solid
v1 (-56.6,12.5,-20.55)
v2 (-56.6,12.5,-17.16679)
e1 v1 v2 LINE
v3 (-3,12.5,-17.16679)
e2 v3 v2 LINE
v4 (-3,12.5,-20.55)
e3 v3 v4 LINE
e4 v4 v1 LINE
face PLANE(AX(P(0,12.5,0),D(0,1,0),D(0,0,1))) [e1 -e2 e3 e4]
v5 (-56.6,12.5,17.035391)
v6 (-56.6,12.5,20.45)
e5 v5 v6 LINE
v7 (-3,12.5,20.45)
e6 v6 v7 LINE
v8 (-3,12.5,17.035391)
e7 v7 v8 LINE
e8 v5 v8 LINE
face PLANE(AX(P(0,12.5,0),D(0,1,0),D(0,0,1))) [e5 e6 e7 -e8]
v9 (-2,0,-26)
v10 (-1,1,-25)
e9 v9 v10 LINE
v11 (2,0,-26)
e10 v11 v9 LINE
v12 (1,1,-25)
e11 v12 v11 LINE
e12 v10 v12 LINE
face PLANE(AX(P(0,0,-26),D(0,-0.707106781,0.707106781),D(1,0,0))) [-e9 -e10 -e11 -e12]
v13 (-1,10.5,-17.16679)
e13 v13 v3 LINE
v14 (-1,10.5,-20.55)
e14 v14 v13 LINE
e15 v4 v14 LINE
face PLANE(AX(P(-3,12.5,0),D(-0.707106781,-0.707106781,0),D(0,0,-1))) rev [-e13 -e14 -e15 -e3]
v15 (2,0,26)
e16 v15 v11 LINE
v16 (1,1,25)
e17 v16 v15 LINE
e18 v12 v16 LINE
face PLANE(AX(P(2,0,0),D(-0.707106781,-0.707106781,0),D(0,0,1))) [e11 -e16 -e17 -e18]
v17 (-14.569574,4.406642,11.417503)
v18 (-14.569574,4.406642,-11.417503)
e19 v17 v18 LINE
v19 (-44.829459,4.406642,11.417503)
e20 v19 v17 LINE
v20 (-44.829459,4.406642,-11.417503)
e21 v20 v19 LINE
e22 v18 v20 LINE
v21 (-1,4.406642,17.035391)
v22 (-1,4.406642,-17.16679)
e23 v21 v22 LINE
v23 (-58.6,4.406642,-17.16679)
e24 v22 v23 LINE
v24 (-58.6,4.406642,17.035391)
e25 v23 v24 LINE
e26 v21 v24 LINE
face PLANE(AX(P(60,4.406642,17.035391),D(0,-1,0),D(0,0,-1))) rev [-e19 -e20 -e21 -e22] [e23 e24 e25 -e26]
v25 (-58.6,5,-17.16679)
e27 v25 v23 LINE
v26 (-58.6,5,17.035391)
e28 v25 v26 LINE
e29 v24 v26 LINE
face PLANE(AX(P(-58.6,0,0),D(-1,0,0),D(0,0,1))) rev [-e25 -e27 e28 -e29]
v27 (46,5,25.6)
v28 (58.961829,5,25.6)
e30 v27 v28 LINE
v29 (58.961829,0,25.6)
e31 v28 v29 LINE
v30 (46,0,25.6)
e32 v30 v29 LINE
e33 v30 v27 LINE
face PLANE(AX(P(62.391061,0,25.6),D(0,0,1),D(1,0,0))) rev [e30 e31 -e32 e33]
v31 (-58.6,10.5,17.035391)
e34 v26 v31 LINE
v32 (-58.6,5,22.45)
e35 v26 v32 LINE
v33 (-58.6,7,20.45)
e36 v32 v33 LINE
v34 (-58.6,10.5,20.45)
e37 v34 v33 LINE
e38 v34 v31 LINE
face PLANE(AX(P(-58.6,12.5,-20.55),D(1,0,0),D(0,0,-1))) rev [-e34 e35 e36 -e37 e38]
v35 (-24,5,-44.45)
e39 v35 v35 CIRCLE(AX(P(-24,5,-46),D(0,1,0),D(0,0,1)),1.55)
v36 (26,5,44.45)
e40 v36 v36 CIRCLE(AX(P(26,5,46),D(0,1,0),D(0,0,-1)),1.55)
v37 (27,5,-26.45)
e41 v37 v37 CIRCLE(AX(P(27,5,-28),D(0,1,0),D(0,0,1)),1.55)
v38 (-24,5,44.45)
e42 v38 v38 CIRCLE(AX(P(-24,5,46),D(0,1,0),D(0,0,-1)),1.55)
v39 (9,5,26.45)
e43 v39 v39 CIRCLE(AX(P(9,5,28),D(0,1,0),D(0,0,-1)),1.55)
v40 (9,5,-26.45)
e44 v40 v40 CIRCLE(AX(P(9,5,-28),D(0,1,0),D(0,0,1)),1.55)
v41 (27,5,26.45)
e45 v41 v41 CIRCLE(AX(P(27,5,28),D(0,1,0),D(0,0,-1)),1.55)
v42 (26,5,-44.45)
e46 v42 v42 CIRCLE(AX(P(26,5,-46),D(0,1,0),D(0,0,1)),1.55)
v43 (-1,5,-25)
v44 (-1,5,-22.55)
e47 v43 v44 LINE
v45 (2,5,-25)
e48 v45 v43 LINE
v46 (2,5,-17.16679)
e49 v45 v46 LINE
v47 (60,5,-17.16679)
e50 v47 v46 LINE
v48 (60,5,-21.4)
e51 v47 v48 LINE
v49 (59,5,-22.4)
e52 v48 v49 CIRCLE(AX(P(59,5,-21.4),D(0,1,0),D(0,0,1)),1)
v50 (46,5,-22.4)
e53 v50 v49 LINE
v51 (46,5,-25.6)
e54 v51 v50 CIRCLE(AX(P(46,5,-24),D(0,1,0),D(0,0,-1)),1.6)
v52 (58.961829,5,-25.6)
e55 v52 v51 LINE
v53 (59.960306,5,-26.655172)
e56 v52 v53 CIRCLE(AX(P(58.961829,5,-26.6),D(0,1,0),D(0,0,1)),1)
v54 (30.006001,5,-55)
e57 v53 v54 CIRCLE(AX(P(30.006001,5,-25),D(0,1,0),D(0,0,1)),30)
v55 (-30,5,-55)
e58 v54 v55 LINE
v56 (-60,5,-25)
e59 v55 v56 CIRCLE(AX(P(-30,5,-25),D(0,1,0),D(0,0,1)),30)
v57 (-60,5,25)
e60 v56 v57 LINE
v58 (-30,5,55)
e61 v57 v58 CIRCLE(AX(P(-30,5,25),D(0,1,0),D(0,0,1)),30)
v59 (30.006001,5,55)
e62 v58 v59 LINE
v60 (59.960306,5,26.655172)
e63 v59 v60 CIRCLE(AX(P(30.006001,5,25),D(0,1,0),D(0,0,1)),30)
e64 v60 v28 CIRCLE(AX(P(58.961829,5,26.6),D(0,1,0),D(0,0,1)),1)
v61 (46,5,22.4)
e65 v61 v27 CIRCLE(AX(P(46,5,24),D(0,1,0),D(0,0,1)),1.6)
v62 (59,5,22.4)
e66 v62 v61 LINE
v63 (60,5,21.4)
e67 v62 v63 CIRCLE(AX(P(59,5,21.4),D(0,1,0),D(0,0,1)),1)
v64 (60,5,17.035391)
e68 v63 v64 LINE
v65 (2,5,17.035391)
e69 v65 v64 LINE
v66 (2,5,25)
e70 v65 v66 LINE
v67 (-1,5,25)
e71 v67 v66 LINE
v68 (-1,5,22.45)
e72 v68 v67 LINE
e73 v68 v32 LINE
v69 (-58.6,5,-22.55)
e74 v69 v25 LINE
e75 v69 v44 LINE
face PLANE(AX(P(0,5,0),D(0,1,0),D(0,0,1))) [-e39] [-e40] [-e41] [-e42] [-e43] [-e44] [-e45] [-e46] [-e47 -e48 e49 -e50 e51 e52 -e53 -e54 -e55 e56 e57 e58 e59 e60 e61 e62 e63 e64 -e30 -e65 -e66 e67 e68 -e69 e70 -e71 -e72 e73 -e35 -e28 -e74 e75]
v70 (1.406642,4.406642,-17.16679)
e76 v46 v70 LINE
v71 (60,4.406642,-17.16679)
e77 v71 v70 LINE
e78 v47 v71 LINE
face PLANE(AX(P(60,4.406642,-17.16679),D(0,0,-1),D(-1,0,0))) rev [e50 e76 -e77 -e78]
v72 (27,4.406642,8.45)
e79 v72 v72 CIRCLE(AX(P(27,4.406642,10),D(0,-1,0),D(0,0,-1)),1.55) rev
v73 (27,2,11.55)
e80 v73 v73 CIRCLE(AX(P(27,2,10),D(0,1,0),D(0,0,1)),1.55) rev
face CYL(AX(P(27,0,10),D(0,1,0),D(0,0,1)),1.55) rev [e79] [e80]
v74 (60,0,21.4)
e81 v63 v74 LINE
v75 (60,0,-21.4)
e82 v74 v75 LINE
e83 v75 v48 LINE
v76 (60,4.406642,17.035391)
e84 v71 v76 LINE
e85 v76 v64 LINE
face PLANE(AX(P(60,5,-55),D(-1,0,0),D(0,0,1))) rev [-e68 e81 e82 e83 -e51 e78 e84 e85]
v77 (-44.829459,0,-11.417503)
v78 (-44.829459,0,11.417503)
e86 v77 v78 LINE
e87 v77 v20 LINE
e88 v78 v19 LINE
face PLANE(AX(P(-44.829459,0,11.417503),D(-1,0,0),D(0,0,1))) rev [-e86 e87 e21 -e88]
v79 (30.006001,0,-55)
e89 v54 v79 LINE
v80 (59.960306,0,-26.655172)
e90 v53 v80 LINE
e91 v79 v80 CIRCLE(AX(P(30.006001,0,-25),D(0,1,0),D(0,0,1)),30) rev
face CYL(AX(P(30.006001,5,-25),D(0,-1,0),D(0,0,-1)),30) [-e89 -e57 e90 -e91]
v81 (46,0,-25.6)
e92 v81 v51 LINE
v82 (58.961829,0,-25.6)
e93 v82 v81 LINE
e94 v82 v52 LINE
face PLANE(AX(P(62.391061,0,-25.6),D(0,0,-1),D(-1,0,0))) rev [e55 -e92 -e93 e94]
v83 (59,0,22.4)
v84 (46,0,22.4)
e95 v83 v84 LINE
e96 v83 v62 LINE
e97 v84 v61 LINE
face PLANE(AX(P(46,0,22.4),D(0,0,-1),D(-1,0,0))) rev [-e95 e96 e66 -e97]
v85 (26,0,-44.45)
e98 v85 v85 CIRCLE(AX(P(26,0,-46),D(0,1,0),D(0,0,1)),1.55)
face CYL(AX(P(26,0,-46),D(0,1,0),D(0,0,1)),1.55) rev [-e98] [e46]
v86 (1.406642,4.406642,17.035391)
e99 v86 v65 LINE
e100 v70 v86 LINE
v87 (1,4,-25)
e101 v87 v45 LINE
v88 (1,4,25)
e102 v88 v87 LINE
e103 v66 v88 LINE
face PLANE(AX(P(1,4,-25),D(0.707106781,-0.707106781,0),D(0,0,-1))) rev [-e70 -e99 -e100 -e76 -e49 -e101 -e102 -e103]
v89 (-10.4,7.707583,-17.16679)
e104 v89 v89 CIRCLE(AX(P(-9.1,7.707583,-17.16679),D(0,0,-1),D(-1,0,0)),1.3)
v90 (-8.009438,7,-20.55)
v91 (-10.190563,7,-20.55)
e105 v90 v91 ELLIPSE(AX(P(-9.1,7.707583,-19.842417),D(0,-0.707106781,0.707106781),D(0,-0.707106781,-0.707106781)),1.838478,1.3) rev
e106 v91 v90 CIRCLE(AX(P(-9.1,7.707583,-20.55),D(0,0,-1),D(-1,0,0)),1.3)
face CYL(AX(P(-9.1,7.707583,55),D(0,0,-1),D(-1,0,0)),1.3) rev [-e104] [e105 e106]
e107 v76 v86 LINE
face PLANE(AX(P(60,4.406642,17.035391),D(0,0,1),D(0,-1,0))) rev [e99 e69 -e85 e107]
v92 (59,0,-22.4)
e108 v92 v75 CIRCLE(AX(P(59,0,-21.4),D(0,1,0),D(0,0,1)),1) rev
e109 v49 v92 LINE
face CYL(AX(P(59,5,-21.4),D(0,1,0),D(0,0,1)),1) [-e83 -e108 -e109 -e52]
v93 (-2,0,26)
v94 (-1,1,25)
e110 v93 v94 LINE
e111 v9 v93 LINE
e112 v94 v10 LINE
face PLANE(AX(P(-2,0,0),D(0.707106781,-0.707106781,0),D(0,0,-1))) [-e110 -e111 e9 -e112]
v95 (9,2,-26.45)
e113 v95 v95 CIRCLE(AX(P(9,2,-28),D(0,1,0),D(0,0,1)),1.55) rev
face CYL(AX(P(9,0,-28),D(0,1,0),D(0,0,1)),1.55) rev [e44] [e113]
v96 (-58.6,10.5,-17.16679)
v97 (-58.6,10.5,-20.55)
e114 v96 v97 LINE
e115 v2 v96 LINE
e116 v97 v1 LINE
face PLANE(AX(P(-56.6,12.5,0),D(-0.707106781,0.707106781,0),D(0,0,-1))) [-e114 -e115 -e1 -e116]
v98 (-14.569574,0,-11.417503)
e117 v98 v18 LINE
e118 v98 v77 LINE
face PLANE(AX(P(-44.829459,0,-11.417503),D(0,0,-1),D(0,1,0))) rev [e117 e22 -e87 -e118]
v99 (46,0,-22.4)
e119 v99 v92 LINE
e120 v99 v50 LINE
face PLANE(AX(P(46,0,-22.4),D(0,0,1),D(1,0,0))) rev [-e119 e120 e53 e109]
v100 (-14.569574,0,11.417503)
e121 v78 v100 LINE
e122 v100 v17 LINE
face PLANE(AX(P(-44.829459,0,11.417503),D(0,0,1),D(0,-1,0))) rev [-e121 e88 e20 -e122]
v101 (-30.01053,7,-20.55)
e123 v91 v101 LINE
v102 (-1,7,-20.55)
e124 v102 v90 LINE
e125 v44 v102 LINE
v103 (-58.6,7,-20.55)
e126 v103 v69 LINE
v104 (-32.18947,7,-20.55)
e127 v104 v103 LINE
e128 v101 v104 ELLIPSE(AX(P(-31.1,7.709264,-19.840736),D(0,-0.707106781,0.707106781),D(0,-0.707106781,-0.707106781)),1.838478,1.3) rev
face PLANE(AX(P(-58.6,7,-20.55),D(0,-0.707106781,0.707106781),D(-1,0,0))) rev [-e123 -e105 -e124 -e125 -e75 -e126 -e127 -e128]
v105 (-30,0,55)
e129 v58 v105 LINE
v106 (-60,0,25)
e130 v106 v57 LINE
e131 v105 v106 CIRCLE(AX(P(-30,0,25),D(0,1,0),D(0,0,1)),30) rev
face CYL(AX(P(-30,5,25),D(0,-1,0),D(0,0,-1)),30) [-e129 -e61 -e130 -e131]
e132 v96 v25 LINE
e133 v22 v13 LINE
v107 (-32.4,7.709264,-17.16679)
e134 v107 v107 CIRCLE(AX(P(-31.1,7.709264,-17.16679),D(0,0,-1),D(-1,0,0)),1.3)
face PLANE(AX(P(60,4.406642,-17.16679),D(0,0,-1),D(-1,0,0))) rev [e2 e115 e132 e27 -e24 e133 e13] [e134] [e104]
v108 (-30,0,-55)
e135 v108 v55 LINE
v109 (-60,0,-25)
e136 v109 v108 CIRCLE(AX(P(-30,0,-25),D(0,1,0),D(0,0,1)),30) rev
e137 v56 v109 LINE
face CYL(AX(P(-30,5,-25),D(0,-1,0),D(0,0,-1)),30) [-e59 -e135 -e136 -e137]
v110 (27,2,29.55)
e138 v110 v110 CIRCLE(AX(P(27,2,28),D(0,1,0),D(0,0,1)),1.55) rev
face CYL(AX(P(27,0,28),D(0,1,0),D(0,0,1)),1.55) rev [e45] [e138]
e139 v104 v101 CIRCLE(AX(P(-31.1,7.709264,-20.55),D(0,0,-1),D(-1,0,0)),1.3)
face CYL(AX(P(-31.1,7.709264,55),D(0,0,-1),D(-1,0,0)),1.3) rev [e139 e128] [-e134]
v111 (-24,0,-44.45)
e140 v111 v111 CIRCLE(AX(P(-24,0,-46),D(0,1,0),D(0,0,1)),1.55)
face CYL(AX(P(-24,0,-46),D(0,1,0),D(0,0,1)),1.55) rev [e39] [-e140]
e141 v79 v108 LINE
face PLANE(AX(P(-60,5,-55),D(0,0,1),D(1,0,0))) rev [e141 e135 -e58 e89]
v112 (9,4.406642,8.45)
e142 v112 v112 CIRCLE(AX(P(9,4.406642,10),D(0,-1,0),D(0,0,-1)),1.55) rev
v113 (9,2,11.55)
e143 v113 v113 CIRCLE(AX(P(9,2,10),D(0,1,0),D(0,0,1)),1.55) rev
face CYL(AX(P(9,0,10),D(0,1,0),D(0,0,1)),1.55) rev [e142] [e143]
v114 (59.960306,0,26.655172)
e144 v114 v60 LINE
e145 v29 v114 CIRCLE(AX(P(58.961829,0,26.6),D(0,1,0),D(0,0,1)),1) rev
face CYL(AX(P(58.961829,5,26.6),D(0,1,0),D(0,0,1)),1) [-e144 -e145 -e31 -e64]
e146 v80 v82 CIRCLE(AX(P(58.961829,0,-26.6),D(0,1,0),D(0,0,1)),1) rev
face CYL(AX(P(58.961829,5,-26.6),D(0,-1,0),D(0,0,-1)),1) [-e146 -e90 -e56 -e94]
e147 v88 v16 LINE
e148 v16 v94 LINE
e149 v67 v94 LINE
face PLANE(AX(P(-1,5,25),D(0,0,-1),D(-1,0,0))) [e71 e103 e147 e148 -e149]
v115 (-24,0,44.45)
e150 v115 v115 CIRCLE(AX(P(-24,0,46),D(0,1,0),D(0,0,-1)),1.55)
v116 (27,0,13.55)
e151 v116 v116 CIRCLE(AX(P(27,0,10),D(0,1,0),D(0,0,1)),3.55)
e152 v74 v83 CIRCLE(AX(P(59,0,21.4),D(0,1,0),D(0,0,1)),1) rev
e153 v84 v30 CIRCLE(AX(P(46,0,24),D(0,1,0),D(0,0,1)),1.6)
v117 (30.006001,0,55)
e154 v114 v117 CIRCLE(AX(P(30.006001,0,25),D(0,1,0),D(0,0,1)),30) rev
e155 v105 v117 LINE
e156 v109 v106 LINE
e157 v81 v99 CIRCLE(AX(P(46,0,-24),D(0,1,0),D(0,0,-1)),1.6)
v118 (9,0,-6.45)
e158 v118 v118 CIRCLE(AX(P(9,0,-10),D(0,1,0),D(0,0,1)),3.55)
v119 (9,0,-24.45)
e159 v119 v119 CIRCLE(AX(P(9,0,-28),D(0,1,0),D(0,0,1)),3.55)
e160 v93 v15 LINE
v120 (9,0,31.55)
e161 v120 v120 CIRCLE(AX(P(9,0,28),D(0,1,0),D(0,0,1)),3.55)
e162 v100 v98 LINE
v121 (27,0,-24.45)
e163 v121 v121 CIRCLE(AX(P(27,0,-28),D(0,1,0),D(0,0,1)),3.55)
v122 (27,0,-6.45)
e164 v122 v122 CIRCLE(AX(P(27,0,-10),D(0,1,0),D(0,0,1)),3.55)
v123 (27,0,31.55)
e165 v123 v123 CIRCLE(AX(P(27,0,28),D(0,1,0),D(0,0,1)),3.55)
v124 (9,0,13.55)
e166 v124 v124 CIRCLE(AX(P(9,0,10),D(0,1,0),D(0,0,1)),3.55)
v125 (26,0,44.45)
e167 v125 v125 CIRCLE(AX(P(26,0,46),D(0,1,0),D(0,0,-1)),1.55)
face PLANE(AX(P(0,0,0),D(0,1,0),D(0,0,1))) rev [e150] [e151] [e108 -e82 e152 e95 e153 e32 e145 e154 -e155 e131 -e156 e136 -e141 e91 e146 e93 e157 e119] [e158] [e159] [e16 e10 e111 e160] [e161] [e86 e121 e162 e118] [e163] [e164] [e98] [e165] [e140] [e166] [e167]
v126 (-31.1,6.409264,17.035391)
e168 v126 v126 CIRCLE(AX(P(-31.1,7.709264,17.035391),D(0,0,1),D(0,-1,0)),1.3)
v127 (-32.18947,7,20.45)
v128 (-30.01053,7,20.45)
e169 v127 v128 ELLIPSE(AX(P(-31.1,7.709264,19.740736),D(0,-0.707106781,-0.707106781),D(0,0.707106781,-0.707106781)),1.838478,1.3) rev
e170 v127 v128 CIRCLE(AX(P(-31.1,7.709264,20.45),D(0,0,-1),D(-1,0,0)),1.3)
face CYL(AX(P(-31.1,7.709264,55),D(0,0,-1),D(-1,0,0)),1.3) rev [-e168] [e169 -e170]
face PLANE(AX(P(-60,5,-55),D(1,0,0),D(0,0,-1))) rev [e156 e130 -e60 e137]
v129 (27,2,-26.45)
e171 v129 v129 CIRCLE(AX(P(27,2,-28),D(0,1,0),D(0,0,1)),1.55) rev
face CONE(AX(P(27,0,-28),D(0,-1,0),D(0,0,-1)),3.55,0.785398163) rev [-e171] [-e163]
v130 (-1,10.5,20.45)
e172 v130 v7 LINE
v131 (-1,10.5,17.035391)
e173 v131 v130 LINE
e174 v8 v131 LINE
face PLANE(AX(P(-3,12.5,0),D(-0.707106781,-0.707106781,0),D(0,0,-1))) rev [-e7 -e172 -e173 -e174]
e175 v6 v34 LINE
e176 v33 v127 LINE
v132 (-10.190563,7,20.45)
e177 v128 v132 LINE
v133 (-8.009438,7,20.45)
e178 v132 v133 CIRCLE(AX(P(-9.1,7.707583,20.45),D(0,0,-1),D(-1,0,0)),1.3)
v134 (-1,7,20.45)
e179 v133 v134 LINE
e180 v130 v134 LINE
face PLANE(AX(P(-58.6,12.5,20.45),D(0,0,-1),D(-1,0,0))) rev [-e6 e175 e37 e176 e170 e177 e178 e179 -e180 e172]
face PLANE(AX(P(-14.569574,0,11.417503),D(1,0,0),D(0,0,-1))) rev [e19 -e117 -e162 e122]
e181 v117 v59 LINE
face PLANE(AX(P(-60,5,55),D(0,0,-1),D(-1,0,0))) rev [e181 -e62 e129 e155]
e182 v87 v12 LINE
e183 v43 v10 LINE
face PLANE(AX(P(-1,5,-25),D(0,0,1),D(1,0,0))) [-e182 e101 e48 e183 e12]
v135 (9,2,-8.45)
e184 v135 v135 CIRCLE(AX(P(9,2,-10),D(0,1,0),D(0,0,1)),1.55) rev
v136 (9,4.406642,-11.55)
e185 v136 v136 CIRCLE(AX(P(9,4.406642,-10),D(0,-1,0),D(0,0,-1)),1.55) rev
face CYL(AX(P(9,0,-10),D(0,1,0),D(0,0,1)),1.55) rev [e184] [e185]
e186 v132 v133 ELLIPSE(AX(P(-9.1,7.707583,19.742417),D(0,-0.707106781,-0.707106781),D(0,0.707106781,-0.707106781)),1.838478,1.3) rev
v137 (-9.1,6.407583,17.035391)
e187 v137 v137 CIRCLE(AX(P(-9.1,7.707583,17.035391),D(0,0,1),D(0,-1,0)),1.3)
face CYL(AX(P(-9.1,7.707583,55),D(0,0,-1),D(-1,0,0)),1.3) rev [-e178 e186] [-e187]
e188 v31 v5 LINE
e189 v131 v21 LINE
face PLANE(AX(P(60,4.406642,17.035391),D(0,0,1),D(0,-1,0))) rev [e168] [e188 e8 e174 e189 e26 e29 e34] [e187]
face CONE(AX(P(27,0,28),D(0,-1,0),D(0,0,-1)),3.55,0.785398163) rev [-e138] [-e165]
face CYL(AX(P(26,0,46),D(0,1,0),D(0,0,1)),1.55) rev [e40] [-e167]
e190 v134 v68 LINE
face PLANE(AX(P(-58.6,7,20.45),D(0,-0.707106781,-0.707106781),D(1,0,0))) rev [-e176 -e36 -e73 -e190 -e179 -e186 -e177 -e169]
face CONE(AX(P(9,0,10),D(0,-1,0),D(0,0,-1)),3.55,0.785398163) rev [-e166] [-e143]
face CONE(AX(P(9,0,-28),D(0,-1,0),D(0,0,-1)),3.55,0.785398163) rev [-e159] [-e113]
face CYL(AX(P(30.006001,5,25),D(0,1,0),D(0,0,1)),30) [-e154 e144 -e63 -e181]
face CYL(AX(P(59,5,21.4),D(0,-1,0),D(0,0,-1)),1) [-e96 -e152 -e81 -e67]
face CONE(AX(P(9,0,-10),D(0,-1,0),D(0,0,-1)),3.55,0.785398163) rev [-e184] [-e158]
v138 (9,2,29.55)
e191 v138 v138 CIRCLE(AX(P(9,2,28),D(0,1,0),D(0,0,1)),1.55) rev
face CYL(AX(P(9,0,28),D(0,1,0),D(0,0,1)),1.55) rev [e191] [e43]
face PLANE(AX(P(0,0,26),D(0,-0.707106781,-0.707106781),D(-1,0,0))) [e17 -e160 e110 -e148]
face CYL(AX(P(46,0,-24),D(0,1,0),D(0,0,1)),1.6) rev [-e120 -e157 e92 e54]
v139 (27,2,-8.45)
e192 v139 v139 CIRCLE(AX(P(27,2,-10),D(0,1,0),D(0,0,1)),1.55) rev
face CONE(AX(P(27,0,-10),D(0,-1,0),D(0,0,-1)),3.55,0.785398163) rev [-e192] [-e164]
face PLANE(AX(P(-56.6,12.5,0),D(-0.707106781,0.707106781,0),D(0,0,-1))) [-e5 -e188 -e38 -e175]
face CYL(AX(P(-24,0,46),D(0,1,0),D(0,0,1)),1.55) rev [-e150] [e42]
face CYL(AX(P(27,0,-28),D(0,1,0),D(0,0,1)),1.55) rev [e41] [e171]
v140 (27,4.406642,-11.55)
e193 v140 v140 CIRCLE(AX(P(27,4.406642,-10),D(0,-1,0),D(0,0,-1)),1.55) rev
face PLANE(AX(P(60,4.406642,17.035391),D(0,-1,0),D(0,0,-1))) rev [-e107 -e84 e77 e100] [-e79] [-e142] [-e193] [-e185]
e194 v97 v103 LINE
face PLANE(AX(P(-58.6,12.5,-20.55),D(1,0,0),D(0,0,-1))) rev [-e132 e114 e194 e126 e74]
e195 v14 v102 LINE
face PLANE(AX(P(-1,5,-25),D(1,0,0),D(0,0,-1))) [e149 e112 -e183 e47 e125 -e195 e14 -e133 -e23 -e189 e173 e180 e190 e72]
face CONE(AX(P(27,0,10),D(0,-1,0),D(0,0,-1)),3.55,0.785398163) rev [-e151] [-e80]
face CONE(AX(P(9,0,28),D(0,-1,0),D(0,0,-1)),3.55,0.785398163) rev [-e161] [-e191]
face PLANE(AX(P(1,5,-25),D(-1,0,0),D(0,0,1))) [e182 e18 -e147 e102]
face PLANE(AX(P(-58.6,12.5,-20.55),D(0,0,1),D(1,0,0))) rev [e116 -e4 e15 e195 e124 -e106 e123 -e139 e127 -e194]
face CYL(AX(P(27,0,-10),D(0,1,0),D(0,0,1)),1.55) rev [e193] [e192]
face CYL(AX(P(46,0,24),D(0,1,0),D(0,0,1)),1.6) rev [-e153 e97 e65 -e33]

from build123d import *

# Parameters (mm, degrees)
SKETCH1_W               = 120
SKETCH1_H               = 110
SKETCH1_W_2             = 2
SKETCH1_H_2             = 50
BOSS_EXTRUDE1_DEPTH     = 5
SKETCH2_R               = 1.55
CUT_EXTRUDE1_DEPTH      = 82.547532152
CROQUIS1_W              = 57.6
CROQUIS1_H              = 41
SALIENTE_EXTRUIR1_DEPTH = 7.5
CROQUIS3_W              = 34.20218154
CROQUIS3_H              = 8.093357641
CORTAR_EXTRUIR1_DEPTH   = 132.328633588
CROQUIS4_R              = 1.3
CORTAR_EXTRUIR2_DEPTH   = 98.283361887
REDONDEO1_R             = 30
CHAFL_N1_SIZE           = 2
CHAFL_N2_SIZE           = 2
CHAFL_N3_SIZE           = 1
REDONDEO2_R             = 1
CROQUIS5_W              = 30.259884699
CROQUIS5_H              = 22.835005582
CORTAR_EXTRUIR3_DEPTH   = 82.79549155


with BuildPart() as part:
    # Sketch1 → Boss-Extrude1 (new body)
    with BuildSketch(Plane(origin=(0, 0, 0), x_dir=(1, 0, 0), z_dir=(0, 1, 0))):
        Rectangle(SKETCH1_W, SKETCH1_H)
        Rectangle(SKETCH1_W_2, SKETCH1_H_2, mode=Mode.SUBTRACT)
    extrude(amount=BOSS_EXTRUDE1_DEPTH)

    # Sketch2 → Cut-Extrude1 (cut, through all)
    with BuildSketch(Plane(origin=(0, 5, 0), x_dir=(1, 0, 0), z_dir=(0, 1, 0))):
        with Locations(Location((9, 28, 0), (0, 0, 270))):
            Circle(SKETCH2_R)
        with Locations(Location((9, 10, 0), (0, 0, 270))):
            Circle(SKETCH2_R)
        with Locations(Location((27, 10, 0), (0, 0, 270))):
            Circle(SKETCH2_R)
        with Locations(Location((27, 28, 0), (0, 0, 270))):
            Circle(SKETCH2_R)
        with Locations(Location((-24, 46, 0), (0, 0, 270))):
            Circle(SKETCH2_R)
        with Locations(Location((26, 46, 0), (0, 0, 270))):
            Circle(SKETCH2_R)
        with Locations(Location((27, -28, 0), (0, 0, 90))):
            Circle(SKETCH2_R)
        with Locations(Location((27, -10, 0), (0, 0, 90))):
            Circle(SKETCH2_R)
        with Locations(Location((9, -10, 0), (0, 0, 90))):
            Circle(SKETCH2_R)
        with Locations(Location((9, -28, 0), (0, 0, 90))):
            Circle(SKETCH2_R)
        with Locations(Location((26, -46, 0), (0, 0, 90))):
            Circle(SKETCH2_R)
        with Locations(Location((-24, -46, 0), (0, 0, 90))):
            Circle(SKETCH2_R)
        with BuildLine():
            Line((46, 22.4), (62.391060934, 22.4))
            Line((62.391060934, 22.4), (62.391060934, 25.6))
            Line((62.391060934, 25.6), (45.999999974, 25.6))
            ThreePointArc((45.999999974, 25.6), (44.4, 23.999999987), (46, 22.4))
        make_face()
        with BuildLine():
            Line((62.391060934, -25.6), (45.999999974, -25.6))
            ThreePointArc((45.999999974, -25.6), (44.4, -23.999999987), (46, -22.4))
            Line((46, -22.4), (62.391060934, -22.4))
            Line((62.391060934, -22.4), (62.391060934, -25.6))
        make_face()
    extrude(amount=-CUT_EXTRUDE1_DEPTH, mode=Mode.SUBTRACT)

    # Croquis1 → Saliente-Extruir1 (add)
    with BuildSketch(Plane(origin=(0, 5, 0), x_dir=(1, 0, 0), z_dir=(0, 1, 0))):
        with Locations((-29.8, 0.05)):
            Rectangle(CROQUIS1_W, CROQUIS1_H)
    extrude(amount=SALIENTE_EXTRUIR1_DEPTH)

    # Croquis3 → Cortar-Extruir1 (cut, through all)
    with BuildSketch(Plane.ZY.offset(58.6)):
        with Locations((-0.065699517, 8.453321179)):
            Rectangle(CROQUIS3_W, CROQUIS3_H)
    extrude(amount=-CORTAR_EXTRUIR1_DEPTH, mode=Mode.SUBTRACT)

    # Croquis4 → Cortar-Extruir2 (cut, through all)
    with BuildSketch(Plane(origin=(0, 0, -20.55), x_dir=(-1, 0, 0), z_dir=(0, 0, -1))):
        with Locations((31.1, 7.709263706)):
            Circle(CROQUIS4_R)
        with Locations((9.100000064, 7.707582737)):
            Circle(CROQUIS4_R)
    extrude(amount=-CORTAR_EXTRUIR2_DEPTH, mode=Mode.SUBTRACT)

    # Redondeo1
    # the kernel refuses this fillet: 30 mm, written as the material it takes off along each edge
    with BuildSketch(Plane(origin=(60, -74.9849985, -55), x_dir=(-1, 0, 0), z_dir=(0, 1, 0))) as redondeo1_piece_1:
        with BuildLine():
            CenterArc((29.9939994, 30), REDONDEO1_R, 181.145991998, 88.854008002)
            Line((0, 29.4), (-0.599879988, 29.388))
            ThreePointArc((-0.599879988, 29.388), (-0.6, 14.7), (-0.6, 0))
            Line((-0.6, 0), (0, -0.6))
            Line((0, -0.6), (29.9939994, -0.6))
            Line((29.9939994, -0.6), (29.9939994, 0))
        make_face()
    extrude(amount=154.969996999, mode=Mode.SUBTRACT)
    with BuildSketch(Plane(origin=(-60, -75, -55), x_dir=(1, 0, 0), z_dir=(0, 1, 0)), Plane(origin=(-60, -75, 55), x_dir=(0, 0, -1), z_dir=(0, 1, 0))) as redondeo1_piece_2:
        with BuildLine():
            CenterArc((REDONDEO1_R, -REDONDEO1_R), REDONDEO1_R, 90, 90)
            Line((0, -REDONDEO1_R), (-REDONDEO1_R * 0.02, -REDONDEO1_R))
            Line((-REDONDEO1_R * 0.02, -REDONDEO1_R), (-REDONDEO1_R * 0.02, REDONDEO1_R * 0.02))
            Line((-REDONDEO1_R * 0.02, REDONDEO1_R * 0.02), (REDONDEO1_R, REDONDEO1_R * 0.02))
            Line((REDONDEO1_R, REDONDEO1_R * 0.02), (REDONDEO1_R, 0))
        make_face()
    extrude(amount=155, mode=Mode.SUBTRACT)
    with BuildSketch(Plane(origin=(60, -74.9849985, 55), x_dir=(-1, 0, 0), z_dir=(0, 1, 0))) as redondeo1_piece_3:
        with BuildLine():
            CenterArc((29.9939994, -30), REDONDEO1_R, 90, 88.854008002)
            Line((0, -29.4), (-0.599879988, -29.388))
            ThreePointArc((-0.599879988, -29.388), (-0.6, -14.7), (-0.6, 0))
            Line((-0.6, 0), (0, 0.6))
            Line((0, 0.6), (29.9939994, 0.6))
            Line((29.9939994, 0.6), (29.9939994, 0))
        make_face()
    extrude(amount=154.969996999, mode=Mode.SUBTRACT)

    # Chaflán1
    # the kernel refuses this chamfer: 2 mm, written as the material it adds along each edge
    with BuildSketch(Plane(origin=(-1, 5, 20.45), x_dir=(0, -0.02749587661058651, 0.9996219169112968), z_dir=(-1, 0, 0))) as chafl_n1_piece_1_section:
        Polygon((CHAFL_N1_SIZE * 0.999621916911, CHAFL_N1_SIZE * 0.0274958766106), (-CHAFL_N1_SIZE * 0.0274958766106, CHAFL_N1_SIZE * 0.999621916911), (0, 0), align=None)
    chafl_n1_piece_1 = extrude(amount=57.6, mode=Mode.PRIVATE)
    chafl_n1_piece_1 = chafl_n1_piece_1 - Plane(origin=(-31.1, 7.709263706, 21.1121364), x_dir=(-1, 0, 0), z_dir=(0, 0, -1)) * Cylinder(1.3, 124, mode=Mode.PRIVATE)
    chafl_n1_piece_1 = chafl_n1_piece_1 - Plane(origin=(-9.100000064, 7.707582737, 21.1121364), x_dir=(-1, 0, 0), z_dir=(0, 0, -1)) * Cylinder(1.3, 124, mode=Mode.PRIVATE)
    add(chafl_n1_piece_1)
    with BuildSketch(Plane(origin=(-58.6, 5, -20.55), x_dir=(0, -0.02749587661058651, -0.9996219169112968), z_dir=(1, 0, 0))) as chafl_n1_piece_2_section:
        Polygon((CHAFL_N1_SIZE * 0.999621916911, CHAFL_N1_SIZE * 0.0274958766106), (-CHAFL_N1_SIZE * 0.0274958766106, CHAFL_N1_SIZE * 0.999621916911), (0, 0), align=None)
    chafl_n1_piece_2 = extrude(amount=57.6, mode=Mode.PRIVATE)
    chafl_n1_piece_2 = chafl_n1_piece_2 - Plane(origin=(-31.1, 7.709263706, -21.2121364), x_dir=(-1, 0, 0), z_dir=(0, 0, -1)) * Cylinder(1.3, 124, mode=Mode.PRIVATE)
    chafl_n1_piece_2 = chafl_n1_piece_2 - Plane(origin=(-9.100000064, 7.707582737, -21.2121364), x_dir=(-1, 0, 0), z_dir=(0, 0, -1)) * Cylinder(1.3, 124, mode=Mode.PRIVATE)
    add(chafl_n1_piece_2)
    # the kernel refuses this chamfer: 2 mm, written as the material it takes off along each edge
    with BuildSketch(Plane(origin=(-58.6, 12.5, -12.023424311), x_dir=(-0.027495876610585623, -0.9996219169112968, 0), z_dir=(0, 0, -1)), Plane(origin=(-1, 12.5, -25.693365976), x_dir=(0.02749587661058638, -0.9996219169112968, 0), z_dir=(0, 0, 1))) as chafl_n1_2_piece_1:
        Polygon((CHAFL_N1_SIZE * 0.999621916911, -CHAFL_N1_SIZE * 0.0274958766106), (-CHAFL_N1_SIZE * 0.0274958766106, -CHAFL_N1_SIZE * 0.999621916911), (0, 0), align=None)
    extrude(amount=13.669941665, mode=Mode.SUBTRACT)
    with BuildSketch(Plane(origin=(-1, 12.5, 11.892025277), x_dir=(0.02749587661058638, -0.9996219169112968, 0), z_dir=(0, 0, 1)), Plane(origin=(-58.6, 12.5, 25.593365976), x_dir=(-0.027495876610585623, -0.9996219169112968, 0), z_dir=(0, 0, -1))) as chafl_n1_2_piece_2:
        Polygon((CHAFL_N1_SIZE * 0.999621916911, -CHAFL_N1_SIZE * 0.0274958766106), (-CHAFL_N1_SIZE * 0.0274958766106, -CHAFL_N1_SIZE * 0.999621916911), (0, 0), align=None)
    extrude(amount=13.701340699, mode=Mode.SUBTRACT)

    # Chaflán2
    chafl_n2_edges = [part.edges().sort_by_distance(p)[0] for p in [
        (27, 0, 29.55),
        (27, 0, -29.55),
        (27, 0, -11.55),
        (9, 0, -11.55),
        (27, 0, 11.55),
        (9, 0, 11.55),
        (9, 0, 29.55),
        (9, 0, -29.55),
    ]]
    chamfer(chafl_n2_edges, length=CHAFL_N2_SIZE)

    # Chaflán3
    chafl_n3_edges = [part.edges().sort_by_distance(p)[0] for p in [
        (-1, 0, 0),
    ]]
    chamfer(chafl_n3_edges, length=CHAFL_N3_SIZE)
    chafl_n3_2_edges = [part.edges().sort_by_distance(p)[0] for p in [
        (0, 0, 25),
    ]]
    chamfer(chafl_n3_2_edges, length=CHAFL_N3_SIZE)
    chafl_n3_3_edges = [part.edges().sort_by_distance(p)[0] for p in [
        (0, 0, -25),
    ]]
    chamfer(chafl_n3_3_edges, length=CHAFL_N3_SIZE)
    chafl_n3_4_edges = [part.edges().sort_by_distance(p)[0] for p in [
        (1, 0, 0),
    ]]
    chamfer(chafl_n3_4_edges, length=CHAFL_N3_SIZE)
    chafl_n3_5_edges = [part.edges().sort_by_distance(p)[0] for p in [
        (1, 5, 21.017695626),
    ]]
    chamfer(chafl_n3_5_edges, length=CHAFL_N3_SIZE)

    # Redondeo2
    redondeo2_edges = [part.edges().sort_by_distance(p)[0] for p in [
        (60, 2.5, -22.4),
        (60, 2.5, -25.6),
        (60, 2.5, 25.6),
        (60, 2.5, 22.4),
    ]]
    fillet(redondeo2_edges, radius=REDONDEO2_R)

    # Croquis5 → Cortar-Extruir3 (cut, through all)
    with BuildSketch(Plane(origin=(0, 4.406642359, 0), x_dir=(1, 0, 0), z_dir=(0, 1, 0))):
        with Locations((-29.699516464, 0)):
            Rectangle(CROQUIS5_W, CROQUIS5_H)
    extrude(amount=-CORTAR_EXTRUIR3_DEPTH, mode=Mode.SUBTRACT)


solid = part.part
